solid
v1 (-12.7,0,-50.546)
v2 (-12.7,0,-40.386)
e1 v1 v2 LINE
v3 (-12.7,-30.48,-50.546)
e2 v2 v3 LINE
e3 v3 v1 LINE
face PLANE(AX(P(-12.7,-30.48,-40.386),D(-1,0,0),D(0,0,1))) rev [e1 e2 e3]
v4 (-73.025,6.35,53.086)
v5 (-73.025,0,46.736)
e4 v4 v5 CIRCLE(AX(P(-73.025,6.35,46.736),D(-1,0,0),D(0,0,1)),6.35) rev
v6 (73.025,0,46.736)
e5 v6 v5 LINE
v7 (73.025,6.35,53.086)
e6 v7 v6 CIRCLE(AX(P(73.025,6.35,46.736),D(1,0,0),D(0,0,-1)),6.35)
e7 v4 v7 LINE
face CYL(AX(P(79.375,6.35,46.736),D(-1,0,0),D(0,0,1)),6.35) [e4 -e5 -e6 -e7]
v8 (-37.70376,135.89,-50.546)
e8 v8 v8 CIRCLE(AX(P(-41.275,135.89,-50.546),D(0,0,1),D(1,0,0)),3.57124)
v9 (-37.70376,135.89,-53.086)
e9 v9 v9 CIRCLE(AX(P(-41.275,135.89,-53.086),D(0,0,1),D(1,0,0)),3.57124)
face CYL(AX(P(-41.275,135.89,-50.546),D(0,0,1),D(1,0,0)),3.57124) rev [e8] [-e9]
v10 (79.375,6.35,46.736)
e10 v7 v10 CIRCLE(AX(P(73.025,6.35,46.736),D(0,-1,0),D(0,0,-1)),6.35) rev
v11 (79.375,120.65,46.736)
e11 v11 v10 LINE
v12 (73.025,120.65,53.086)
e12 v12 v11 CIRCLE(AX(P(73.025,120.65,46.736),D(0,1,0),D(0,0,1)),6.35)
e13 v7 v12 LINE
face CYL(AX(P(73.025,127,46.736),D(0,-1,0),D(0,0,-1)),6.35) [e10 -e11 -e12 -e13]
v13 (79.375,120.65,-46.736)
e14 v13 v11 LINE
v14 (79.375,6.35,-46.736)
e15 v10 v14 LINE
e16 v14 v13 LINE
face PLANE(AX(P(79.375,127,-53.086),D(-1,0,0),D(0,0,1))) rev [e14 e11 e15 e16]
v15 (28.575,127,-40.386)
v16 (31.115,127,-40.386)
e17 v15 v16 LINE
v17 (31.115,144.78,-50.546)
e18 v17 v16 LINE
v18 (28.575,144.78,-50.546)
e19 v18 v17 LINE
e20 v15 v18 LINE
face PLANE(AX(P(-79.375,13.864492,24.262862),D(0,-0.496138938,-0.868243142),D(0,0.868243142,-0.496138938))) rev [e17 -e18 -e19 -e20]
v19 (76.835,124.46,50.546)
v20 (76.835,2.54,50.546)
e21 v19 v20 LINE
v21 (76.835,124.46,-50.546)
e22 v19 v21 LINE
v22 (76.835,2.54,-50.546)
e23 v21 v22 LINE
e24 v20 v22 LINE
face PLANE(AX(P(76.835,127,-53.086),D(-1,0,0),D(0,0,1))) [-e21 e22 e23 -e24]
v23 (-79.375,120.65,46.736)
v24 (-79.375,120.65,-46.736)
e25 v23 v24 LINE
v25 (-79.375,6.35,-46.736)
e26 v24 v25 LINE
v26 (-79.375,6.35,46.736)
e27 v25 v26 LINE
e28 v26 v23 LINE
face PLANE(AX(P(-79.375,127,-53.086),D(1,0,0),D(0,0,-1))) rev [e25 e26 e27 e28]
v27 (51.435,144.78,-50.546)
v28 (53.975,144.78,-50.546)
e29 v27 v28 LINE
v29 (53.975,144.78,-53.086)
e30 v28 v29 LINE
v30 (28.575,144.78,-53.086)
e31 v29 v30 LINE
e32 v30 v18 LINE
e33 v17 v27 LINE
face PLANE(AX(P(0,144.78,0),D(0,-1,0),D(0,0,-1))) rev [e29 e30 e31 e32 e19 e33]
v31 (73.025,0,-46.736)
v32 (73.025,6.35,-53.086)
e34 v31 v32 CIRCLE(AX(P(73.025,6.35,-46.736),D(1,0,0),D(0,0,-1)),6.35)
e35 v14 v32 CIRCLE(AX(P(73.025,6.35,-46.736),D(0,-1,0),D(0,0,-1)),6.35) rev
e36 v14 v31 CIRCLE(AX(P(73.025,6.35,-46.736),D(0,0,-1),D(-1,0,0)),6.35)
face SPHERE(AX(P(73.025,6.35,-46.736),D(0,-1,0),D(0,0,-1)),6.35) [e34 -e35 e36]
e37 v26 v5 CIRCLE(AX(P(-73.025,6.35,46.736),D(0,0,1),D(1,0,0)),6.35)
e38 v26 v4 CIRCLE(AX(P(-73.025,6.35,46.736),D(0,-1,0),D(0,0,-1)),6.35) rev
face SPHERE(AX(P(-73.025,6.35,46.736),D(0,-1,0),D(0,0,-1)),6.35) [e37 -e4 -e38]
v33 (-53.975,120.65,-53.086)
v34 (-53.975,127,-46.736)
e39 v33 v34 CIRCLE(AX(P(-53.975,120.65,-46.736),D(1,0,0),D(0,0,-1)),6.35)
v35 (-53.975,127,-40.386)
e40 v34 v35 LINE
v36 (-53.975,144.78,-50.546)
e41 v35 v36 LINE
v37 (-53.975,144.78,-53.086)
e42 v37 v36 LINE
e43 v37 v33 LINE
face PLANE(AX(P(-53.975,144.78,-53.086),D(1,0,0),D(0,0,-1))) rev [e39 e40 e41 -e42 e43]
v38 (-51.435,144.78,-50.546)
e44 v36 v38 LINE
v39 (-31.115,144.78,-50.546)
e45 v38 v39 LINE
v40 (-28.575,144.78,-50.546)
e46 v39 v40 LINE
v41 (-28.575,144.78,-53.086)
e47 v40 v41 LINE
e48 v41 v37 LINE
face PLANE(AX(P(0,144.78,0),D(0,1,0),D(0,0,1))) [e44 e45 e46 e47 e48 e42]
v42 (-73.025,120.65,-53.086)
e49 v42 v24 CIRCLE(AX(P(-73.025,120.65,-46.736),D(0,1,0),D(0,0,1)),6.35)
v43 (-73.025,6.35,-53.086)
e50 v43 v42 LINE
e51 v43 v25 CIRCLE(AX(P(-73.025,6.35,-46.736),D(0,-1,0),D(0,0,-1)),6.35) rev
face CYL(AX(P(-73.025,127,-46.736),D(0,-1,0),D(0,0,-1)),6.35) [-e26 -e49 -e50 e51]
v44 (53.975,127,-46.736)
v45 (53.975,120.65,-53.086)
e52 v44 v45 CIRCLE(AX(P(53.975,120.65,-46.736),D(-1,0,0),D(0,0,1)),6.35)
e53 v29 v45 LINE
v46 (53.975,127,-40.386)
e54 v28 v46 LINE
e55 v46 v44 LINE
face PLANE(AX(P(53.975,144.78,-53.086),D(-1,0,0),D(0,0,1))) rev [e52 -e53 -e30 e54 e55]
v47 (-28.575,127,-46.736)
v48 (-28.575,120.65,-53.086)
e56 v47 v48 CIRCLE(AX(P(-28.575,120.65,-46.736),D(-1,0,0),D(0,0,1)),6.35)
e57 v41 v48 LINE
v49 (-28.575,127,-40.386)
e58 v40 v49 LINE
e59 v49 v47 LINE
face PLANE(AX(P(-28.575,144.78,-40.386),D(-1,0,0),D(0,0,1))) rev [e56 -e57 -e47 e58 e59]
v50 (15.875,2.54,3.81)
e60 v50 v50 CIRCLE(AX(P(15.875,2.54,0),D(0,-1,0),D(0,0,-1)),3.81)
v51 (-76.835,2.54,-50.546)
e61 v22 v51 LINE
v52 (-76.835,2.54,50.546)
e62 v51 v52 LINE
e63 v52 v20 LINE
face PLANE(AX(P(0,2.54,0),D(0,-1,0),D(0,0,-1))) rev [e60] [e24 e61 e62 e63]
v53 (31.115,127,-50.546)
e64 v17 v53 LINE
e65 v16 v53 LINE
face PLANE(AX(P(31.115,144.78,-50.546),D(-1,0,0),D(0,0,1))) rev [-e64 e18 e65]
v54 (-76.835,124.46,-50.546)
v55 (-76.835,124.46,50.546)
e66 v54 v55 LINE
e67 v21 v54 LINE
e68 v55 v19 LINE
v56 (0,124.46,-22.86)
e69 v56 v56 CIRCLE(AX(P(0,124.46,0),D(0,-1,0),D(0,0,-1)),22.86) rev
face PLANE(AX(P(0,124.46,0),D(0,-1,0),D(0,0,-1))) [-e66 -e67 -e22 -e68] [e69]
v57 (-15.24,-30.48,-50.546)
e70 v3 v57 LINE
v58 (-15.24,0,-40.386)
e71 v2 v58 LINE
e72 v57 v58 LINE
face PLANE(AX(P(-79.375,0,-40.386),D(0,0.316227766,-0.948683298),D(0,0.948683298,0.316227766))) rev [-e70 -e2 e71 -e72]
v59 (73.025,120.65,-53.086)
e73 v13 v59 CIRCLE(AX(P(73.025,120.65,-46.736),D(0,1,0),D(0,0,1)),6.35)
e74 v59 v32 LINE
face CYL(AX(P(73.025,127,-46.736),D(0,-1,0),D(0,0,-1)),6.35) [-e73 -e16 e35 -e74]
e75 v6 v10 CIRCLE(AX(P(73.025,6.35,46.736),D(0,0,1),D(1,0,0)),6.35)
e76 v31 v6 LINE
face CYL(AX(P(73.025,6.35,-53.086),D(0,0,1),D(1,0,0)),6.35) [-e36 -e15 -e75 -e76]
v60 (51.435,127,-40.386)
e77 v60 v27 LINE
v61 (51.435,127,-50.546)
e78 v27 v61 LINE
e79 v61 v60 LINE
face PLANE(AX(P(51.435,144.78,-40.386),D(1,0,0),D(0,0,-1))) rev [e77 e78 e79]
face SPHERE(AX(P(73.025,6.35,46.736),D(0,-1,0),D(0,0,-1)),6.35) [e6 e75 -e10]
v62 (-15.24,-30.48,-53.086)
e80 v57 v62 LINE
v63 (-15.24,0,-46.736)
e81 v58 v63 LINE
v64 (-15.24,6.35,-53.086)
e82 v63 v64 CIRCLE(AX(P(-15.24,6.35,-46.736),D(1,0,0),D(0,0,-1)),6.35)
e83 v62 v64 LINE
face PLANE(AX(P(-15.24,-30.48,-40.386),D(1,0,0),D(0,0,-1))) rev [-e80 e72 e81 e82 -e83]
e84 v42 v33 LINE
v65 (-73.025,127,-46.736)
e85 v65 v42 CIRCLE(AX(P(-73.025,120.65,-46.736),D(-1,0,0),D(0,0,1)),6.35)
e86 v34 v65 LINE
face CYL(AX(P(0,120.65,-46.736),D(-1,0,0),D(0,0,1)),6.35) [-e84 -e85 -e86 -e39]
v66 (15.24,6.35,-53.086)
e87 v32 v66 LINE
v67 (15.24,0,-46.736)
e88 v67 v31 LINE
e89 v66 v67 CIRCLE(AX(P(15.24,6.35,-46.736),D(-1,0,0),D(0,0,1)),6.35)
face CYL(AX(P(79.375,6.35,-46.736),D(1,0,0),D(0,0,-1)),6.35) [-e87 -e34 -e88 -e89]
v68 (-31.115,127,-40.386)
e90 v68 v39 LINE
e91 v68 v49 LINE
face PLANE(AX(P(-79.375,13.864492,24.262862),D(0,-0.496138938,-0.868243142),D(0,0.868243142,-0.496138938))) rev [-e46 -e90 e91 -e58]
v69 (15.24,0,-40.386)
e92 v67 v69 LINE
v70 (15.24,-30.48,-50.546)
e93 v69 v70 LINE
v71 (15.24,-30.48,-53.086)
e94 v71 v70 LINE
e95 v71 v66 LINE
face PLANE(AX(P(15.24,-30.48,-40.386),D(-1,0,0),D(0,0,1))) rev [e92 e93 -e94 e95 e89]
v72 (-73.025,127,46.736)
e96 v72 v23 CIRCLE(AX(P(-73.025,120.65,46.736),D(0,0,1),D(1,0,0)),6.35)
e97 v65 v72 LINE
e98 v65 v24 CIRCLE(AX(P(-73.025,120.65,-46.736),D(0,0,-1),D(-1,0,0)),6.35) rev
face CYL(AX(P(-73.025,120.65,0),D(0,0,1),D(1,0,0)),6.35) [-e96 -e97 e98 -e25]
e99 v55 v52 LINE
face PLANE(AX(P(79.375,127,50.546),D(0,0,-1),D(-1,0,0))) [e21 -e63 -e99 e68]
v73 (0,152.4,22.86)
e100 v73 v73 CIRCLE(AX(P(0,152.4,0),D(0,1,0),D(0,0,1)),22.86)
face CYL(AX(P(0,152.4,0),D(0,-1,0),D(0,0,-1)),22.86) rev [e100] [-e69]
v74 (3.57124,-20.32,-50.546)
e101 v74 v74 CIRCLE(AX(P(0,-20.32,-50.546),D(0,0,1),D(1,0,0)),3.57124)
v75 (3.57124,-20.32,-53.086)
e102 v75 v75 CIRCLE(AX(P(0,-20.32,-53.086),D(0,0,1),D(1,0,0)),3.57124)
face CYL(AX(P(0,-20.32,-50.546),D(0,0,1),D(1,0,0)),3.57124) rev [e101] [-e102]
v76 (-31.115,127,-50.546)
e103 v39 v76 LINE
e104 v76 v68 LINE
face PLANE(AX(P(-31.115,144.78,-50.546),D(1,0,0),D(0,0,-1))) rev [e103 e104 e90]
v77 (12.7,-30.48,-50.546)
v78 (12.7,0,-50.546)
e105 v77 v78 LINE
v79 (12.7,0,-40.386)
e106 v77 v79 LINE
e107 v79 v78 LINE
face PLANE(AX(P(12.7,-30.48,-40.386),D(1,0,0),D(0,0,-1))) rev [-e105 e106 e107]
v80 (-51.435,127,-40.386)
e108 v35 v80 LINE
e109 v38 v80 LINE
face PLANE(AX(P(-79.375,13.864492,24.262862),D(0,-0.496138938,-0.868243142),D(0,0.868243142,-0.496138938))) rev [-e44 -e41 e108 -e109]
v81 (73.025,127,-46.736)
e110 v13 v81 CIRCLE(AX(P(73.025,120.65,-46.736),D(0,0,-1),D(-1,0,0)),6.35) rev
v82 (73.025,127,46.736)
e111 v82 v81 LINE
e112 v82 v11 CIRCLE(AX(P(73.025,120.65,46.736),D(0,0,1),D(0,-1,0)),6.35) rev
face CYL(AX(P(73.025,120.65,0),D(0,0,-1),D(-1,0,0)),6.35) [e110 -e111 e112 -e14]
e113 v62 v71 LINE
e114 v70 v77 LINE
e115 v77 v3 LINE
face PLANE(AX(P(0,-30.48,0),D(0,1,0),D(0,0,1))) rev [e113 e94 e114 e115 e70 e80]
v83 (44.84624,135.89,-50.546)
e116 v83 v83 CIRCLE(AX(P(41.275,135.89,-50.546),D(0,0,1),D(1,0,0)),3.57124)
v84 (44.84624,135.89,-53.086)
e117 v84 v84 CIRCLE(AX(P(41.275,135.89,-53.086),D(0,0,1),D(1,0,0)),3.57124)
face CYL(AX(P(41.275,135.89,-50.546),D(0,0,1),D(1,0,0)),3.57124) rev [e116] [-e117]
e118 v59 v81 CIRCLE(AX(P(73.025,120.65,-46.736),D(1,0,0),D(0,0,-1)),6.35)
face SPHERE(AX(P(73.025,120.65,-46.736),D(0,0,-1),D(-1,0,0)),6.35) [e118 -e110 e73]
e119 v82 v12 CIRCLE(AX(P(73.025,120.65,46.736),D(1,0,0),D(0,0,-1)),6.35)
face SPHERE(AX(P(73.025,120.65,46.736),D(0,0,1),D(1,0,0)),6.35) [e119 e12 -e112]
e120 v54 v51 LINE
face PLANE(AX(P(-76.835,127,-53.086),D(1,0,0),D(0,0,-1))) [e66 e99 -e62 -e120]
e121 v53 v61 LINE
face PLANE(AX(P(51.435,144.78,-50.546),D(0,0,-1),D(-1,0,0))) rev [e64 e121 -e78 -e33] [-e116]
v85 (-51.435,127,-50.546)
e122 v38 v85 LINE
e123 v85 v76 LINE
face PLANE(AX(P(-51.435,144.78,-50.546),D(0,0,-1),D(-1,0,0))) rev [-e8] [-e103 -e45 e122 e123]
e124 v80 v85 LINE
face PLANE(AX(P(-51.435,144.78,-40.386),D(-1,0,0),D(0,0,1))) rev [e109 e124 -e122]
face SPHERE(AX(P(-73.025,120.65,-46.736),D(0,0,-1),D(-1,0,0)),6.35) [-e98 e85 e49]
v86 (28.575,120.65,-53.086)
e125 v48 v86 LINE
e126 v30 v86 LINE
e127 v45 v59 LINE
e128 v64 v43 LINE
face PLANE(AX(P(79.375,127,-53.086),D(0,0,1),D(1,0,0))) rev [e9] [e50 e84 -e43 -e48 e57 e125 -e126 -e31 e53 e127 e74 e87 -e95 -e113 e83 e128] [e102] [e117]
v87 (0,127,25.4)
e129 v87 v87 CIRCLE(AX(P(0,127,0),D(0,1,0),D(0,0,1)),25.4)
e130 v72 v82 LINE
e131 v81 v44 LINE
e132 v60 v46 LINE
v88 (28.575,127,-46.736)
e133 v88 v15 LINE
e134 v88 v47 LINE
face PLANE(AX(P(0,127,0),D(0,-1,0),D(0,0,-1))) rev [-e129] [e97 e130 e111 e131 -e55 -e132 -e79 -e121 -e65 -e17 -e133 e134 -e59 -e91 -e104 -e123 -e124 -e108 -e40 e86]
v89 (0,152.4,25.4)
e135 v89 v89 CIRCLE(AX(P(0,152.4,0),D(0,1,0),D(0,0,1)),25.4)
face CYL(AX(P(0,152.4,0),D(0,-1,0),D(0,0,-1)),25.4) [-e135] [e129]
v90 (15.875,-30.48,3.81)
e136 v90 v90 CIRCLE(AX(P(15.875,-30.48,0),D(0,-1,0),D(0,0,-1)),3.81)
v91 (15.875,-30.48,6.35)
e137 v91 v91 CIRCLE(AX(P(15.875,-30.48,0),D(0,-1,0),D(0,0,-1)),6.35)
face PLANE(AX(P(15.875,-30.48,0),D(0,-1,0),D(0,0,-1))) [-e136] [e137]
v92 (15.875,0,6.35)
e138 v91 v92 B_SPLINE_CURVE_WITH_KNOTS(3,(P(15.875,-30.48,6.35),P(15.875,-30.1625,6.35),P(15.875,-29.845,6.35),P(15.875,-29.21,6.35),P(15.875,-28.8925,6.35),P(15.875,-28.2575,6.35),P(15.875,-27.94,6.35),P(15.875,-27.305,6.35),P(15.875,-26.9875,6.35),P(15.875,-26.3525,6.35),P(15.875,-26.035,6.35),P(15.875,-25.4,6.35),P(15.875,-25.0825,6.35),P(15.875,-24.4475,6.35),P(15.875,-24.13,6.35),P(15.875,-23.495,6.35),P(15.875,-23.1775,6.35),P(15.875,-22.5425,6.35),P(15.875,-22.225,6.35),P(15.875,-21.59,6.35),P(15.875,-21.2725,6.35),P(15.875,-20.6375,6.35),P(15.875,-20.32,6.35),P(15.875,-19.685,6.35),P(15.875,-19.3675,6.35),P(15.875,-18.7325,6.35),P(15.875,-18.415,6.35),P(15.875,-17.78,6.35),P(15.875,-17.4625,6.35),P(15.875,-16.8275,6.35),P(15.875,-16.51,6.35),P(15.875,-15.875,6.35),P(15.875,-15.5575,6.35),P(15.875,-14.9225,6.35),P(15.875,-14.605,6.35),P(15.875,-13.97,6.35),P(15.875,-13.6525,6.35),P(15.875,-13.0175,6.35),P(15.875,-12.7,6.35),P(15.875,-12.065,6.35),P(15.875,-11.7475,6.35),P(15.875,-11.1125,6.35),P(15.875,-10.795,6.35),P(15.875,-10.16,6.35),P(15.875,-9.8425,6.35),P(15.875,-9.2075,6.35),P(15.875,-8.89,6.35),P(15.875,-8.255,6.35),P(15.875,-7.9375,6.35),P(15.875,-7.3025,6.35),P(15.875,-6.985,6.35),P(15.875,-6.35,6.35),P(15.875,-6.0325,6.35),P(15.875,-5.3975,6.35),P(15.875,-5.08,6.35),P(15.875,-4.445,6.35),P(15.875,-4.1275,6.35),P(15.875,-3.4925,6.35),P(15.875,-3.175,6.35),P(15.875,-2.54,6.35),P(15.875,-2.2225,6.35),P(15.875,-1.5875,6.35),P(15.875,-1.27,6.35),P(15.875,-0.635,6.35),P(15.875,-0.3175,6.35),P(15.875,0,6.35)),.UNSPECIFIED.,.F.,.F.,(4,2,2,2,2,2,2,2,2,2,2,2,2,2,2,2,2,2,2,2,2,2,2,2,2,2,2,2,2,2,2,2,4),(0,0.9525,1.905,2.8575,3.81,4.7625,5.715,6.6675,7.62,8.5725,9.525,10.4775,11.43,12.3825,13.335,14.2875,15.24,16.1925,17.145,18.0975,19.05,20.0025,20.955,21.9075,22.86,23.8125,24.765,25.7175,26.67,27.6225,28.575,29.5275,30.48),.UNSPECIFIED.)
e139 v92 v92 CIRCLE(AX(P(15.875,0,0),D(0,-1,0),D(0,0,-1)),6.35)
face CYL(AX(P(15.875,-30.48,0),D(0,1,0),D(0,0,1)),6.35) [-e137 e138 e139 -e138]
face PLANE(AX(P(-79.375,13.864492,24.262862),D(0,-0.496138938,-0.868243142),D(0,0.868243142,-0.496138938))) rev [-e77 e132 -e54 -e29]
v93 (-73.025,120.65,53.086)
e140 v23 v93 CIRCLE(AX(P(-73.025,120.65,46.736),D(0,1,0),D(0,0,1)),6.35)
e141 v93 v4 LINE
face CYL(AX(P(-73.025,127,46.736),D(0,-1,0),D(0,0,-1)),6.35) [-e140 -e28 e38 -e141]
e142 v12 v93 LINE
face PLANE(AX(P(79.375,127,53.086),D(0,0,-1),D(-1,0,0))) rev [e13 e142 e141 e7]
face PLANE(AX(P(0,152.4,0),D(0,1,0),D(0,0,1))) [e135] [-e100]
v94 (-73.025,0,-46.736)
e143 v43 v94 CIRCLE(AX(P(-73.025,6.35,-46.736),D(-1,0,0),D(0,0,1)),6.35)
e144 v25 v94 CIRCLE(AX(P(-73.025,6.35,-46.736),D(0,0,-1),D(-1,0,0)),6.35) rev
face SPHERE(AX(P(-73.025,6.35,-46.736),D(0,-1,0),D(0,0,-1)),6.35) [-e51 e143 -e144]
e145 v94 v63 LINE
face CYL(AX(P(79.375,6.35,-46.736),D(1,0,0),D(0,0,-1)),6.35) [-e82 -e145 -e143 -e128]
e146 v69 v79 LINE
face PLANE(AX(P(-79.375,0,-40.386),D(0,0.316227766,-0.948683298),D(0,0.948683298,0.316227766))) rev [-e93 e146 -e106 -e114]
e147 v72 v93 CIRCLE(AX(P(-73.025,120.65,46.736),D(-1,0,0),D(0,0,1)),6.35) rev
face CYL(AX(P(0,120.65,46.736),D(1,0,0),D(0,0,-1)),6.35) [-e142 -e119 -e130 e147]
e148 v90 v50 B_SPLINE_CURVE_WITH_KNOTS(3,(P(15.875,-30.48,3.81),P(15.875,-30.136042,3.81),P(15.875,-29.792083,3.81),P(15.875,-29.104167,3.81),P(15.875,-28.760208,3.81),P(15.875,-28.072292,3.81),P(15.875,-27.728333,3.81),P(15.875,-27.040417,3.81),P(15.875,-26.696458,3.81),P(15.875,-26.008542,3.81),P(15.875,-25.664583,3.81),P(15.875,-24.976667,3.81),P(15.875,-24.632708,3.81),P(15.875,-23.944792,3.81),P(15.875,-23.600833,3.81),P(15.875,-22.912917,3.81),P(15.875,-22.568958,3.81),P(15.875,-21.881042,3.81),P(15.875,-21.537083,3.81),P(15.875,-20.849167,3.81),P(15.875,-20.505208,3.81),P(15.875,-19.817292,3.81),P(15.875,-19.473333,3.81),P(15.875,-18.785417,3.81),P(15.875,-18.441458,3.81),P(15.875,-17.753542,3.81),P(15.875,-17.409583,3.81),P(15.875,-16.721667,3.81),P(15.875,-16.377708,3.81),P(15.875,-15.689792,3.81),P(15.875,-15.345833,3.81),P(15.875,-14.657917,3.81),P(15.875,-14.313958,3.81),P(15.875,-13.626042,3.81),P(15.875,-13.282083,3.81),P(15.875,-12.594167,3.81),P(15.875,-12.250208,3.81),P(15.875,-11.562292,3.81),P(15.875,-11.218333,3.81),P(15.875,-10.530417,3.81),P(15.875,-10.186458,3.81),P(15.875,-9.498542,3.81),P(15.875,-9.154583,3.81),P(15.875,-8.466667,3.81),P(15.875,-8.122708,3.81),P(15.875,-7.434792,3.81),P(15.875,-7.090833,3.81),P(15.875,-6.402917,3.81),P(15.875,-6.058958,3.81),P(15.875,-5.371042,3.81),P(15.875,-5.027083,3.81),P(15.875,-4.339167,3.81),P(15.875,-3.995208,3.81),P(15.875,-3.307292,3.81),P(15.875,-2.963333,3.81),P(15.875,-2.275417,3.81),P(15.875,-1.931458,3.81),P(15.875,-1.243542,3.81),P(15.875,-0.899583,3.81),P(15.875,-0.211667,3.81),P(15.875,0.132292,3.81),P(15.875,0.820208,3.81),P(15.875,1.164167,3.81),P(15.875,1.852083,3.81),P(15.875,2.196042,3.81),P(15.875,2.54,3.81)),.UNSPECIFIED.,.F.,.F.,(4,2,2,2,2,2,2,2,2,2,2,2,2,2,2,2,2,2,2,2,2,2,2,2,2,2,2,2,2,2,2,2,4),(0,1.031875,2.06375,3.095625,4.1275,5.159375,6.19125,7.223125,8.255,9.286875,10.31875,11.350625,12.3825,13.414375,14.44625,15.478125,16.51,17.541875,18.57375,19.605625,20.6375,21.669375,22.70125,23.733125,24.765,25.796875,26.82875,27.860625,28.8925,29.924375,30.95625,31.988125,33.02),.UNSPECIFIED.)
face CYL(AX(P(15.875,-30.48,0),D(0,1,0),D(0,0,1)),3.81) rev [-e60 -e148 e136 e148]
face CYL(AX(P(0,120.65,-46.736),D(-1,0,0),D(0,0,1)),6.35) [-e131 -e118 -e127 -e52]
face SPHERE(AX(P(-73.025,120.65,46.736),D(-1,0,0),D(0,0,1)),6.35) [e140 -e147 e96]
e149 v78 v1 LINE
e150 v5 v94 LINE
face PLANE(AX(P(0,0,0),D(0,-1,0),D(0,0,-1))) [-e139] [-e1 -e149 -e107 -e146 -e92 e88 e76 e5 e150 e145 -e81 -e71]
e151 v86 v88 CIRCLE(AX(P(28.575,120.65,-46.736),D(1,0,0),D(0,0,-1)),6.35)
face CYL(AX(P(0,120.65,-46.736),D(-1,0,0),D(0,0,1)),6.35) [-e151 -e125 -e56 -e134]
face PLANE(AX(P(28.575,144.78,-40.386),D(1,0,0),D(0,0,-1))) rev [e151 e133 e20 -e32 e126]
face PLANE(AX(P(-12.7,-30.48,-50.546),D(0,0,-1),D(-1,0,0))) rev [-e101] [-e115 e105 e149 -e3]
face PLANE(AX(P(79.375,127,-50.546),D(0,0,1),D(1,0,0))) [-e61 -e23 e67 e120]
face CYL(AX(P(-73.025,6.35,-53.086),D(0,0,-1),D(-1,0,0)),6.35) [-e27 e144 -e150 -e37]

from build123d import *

# Parameters (mm, degrees)
SKETCH1_W               = 158.75
SKETCH1_H               = 106.172
BOSS_EXTRUDE1_DEPTH     = 127
SKETCH2_R               = 25.4
BOSS_EXTRUDE2_DEPTH     = 25.4
SKETCH8_R               = 6.35
BOSS_EXTRUDE5_DEPTH     = 30.48
BOSS_EXTRUDE3_DEPTH     = 17.78
CUT_EXTRUDE2_DEPTH      = 196.580989608
CUT_EXTRUDE2_DEPTH_BACK = 196.580989608
BOSS_EXTRUDE4_DEPTH     = 30.48
SHELL1_START            = 2.54
SHELL1_OUTLINE_W        = 153.67
SHELL1_OUTLINE_H        = 101.092
SHELL1_DEPTH            = 121.92
SHELL1_START_2          = 124.46
SHELL1_2_OUTLINE_R      = 22.86
SHELL1_2_DEPTH          = 27.94
SHELL1_START_3          = -30.48
SHELL1_3_OUTLINE_R      = 3.81
SHELL1_3_DEPTH          = 33.02
CUT_EXTRUDE4_DEPTH      = 186.800131919
CUT_EXTRUDE4_DEPTH_BACK = 186.800131919
F_1_4_CLEARANCE_HOLE1_D = 7.14248
FILLET1_R               = 6.35


# Read off the part's stored shape, not the designer's step: Shell1
with BuildPart() as part:
    # Sketch1 → Boss-Extrude1 (new body)
    with BuildSketch(Plane(origin=(0, 0, 0), x_dir=(1, 0, 0), z_dir=(0, 1, 0))):
        Rectangle(SKETCH1_W, SKETCH1_H)
    extrude(amount=BOSS_EXTRUDE1_DEPTH)

    # Sketch2 → Boss-Extrude2 (add)
    with BuildSketch(Plane(origin=(0, 127, 0), x_dir=(1, 0, 0), z_dir=(0, 1, 0))):
        with Locations(Location((0, 0, 0), (0, 0, 270))):
            Circle(SKETCH2_R)
    extrude(amount=BOSS_EXTRUDE2_DEPTH)

    # Sketch8 → Boss-Extrude5 (add)
    with BuildSketch(Plane.XZ):
        with Locations(Location((15.875, 0, 0), (0, 0, 90))):
            Circle(SKETCH8_R)
    extrude(amount=BOSS_EXTRUDE5_DEPTH)

    # Sketch3 → Boss-Extrude3 (add)
    with BuildSketch(Plane(origin=(0, 127, 0), x_dir=(1, 0, 0), z_dir=(0, 1, 0))):
        Polygon((-53.975, 53.086), (-53.975, 40.386), (-51.435, 40.386), (-51.435, 50.546), (-31.115, 50.546), (-31.115, 40.386), (-28.575, 40.386), (-28.575, 53.086), align=None)
        Polygon((28.575, 53.086), (53.975, 53.086), (53.975, 40.386), (51.435, 40.386), (51.435, 50.546), (31.115, 50.546), (31.115, 40.386), (28.575, 40.386), align=None)
    extrude(amount=BOSS_EXTRUDE3_DEPTH)

    # Sketch5 → Cut-Extrude2 (cut, two sides: drawn at the far end of the back side and taken through both)
    with BuildSketch(Plane(origin=(31.115, 0, 0), x_dir=(0, 0, -1), z_dir=(1, 0, 0)).offset(-CUT_EXTRUDE2_DEPTH_BACK)):
        Polygon((40.386, 127), (50.546, 144.78), (40.386, 144.78), align=None)
    extrude(amount=CUT_EXTRUDE2_DEPTH + CUT_EXTRUDE2_DEPTH_BACK, mode=Mode.SUBTRACT)

    # Sketch7 → Boss-Extrude4 (add)
    with BuildSketch(Plane.XZ):
        Polygon((-15.24, -40.386), (-15.24, -53.086), (15.24, -53.086), (15.24, -40.386), (12.7, -40.386), (12.7, -50.546), (-12.7, -50.546), (-12.7, -40.386), align=None)
    extrude(amount=BOSS_EXTRUDE4_DEPTH)

    # Shell1 outline → Shell1 (cut)
    with BuildSketch(Plane(origin=(0, 0, 0), x_dir=(1, 0, 0), z_dir=(0, 1, 0)).offset(SHELL1_START)):
        Rectangle(SHELL1_OUTLINE_W, SHELL1_OUTLINE_H)
    extrude(amount=SHELL1_DEPTH, mode=Mode.SUBTRACT)

    # Shell1 2 outline → Shell1 2 (cut)
    with BuildSketch(Plane(origin=(0, 0, 0), x_dir=(1, 0, 0), z_dir=(0, 1, 0)).offset(SHELL1_START_2)):
        Circle(SHELL1_2_OUTLINE_R)
    extrude(amount=SHELL1_2_DEPTH, mode=Mode.SUBTRACT)

    # Shell1 3 outline → Shell1 3 (cut)
    with BuildSketch(Plane(origin=(0, 0, 0), x_dir=(1, 0, 0), z_dir=(0, 1, 0)).offset(SHELL1_START_3)):
        with Locations((15.875, 0)):
            Circle(SHELL1_3_OUTLINE_R)
    extrude(amount=SHELL1_3_DEPTH, mode=Mode.SUBTRACT)

    # Sketch9 → Cut-Extrude4 (cut, two sides: drawn at the far end of the back side and taken through both)
    with BuildSketch(Plane(origin=(-12.7, 0, 0), x_dir=(0, 0, -1), z_dir=(1, 0, 0)).offset(-CUT_EXTRUDE4_DEPTH_BACK)):
        Polygon((40.386, 0), (50.546, -30.48), (40.386, -30.48), align=None)
    extrude(amount=CUT_EXTRUDE4_DEPTH + CUT_EXTRUDE4_DEPTH_BACK, mode=Mode.SUBTRACT)

    # 1/4 Clearance Hole1 (through all)
    with Locations(Plane(origin=(-41.275, 135.89, -50.546), x_dir=(1, 0, 0), z_dir=(0, 0, 1))):
        with Locations((0, 0), (82.55, 0), (41.275, -156.21)):
            Hole(F_1_4_CLEARANCE_HOLE1_D / 2)

    # Fillet1
    fillet1_edges = [part.edges().sort_by_distance(p)[0] for p in [
        (-47.3075, 0, -53.086),
        (79.375, 127, 0),
        (66.675, 127, -53.086),
        (-66.675, 127, -53.086),
        (0, 127, -53.086),
        (-79.375, 127, 0),
        (47.3075, 0, -53.086),
        (79.375, 0, 0),
        (0, 0, 53.086),
        (-79.375, 0, 0),
        (-79.375, 63.5, -53.086),
        (79.375, 63.5, -53.086),
        (79.375, 63.5, 53.086),
        (-79.375, 63.5, 53.086),
        (0, 127, 53.086),
    ]]
    fillet(fillet1_edges, radius=FILLET1_R)


solid = part.part
